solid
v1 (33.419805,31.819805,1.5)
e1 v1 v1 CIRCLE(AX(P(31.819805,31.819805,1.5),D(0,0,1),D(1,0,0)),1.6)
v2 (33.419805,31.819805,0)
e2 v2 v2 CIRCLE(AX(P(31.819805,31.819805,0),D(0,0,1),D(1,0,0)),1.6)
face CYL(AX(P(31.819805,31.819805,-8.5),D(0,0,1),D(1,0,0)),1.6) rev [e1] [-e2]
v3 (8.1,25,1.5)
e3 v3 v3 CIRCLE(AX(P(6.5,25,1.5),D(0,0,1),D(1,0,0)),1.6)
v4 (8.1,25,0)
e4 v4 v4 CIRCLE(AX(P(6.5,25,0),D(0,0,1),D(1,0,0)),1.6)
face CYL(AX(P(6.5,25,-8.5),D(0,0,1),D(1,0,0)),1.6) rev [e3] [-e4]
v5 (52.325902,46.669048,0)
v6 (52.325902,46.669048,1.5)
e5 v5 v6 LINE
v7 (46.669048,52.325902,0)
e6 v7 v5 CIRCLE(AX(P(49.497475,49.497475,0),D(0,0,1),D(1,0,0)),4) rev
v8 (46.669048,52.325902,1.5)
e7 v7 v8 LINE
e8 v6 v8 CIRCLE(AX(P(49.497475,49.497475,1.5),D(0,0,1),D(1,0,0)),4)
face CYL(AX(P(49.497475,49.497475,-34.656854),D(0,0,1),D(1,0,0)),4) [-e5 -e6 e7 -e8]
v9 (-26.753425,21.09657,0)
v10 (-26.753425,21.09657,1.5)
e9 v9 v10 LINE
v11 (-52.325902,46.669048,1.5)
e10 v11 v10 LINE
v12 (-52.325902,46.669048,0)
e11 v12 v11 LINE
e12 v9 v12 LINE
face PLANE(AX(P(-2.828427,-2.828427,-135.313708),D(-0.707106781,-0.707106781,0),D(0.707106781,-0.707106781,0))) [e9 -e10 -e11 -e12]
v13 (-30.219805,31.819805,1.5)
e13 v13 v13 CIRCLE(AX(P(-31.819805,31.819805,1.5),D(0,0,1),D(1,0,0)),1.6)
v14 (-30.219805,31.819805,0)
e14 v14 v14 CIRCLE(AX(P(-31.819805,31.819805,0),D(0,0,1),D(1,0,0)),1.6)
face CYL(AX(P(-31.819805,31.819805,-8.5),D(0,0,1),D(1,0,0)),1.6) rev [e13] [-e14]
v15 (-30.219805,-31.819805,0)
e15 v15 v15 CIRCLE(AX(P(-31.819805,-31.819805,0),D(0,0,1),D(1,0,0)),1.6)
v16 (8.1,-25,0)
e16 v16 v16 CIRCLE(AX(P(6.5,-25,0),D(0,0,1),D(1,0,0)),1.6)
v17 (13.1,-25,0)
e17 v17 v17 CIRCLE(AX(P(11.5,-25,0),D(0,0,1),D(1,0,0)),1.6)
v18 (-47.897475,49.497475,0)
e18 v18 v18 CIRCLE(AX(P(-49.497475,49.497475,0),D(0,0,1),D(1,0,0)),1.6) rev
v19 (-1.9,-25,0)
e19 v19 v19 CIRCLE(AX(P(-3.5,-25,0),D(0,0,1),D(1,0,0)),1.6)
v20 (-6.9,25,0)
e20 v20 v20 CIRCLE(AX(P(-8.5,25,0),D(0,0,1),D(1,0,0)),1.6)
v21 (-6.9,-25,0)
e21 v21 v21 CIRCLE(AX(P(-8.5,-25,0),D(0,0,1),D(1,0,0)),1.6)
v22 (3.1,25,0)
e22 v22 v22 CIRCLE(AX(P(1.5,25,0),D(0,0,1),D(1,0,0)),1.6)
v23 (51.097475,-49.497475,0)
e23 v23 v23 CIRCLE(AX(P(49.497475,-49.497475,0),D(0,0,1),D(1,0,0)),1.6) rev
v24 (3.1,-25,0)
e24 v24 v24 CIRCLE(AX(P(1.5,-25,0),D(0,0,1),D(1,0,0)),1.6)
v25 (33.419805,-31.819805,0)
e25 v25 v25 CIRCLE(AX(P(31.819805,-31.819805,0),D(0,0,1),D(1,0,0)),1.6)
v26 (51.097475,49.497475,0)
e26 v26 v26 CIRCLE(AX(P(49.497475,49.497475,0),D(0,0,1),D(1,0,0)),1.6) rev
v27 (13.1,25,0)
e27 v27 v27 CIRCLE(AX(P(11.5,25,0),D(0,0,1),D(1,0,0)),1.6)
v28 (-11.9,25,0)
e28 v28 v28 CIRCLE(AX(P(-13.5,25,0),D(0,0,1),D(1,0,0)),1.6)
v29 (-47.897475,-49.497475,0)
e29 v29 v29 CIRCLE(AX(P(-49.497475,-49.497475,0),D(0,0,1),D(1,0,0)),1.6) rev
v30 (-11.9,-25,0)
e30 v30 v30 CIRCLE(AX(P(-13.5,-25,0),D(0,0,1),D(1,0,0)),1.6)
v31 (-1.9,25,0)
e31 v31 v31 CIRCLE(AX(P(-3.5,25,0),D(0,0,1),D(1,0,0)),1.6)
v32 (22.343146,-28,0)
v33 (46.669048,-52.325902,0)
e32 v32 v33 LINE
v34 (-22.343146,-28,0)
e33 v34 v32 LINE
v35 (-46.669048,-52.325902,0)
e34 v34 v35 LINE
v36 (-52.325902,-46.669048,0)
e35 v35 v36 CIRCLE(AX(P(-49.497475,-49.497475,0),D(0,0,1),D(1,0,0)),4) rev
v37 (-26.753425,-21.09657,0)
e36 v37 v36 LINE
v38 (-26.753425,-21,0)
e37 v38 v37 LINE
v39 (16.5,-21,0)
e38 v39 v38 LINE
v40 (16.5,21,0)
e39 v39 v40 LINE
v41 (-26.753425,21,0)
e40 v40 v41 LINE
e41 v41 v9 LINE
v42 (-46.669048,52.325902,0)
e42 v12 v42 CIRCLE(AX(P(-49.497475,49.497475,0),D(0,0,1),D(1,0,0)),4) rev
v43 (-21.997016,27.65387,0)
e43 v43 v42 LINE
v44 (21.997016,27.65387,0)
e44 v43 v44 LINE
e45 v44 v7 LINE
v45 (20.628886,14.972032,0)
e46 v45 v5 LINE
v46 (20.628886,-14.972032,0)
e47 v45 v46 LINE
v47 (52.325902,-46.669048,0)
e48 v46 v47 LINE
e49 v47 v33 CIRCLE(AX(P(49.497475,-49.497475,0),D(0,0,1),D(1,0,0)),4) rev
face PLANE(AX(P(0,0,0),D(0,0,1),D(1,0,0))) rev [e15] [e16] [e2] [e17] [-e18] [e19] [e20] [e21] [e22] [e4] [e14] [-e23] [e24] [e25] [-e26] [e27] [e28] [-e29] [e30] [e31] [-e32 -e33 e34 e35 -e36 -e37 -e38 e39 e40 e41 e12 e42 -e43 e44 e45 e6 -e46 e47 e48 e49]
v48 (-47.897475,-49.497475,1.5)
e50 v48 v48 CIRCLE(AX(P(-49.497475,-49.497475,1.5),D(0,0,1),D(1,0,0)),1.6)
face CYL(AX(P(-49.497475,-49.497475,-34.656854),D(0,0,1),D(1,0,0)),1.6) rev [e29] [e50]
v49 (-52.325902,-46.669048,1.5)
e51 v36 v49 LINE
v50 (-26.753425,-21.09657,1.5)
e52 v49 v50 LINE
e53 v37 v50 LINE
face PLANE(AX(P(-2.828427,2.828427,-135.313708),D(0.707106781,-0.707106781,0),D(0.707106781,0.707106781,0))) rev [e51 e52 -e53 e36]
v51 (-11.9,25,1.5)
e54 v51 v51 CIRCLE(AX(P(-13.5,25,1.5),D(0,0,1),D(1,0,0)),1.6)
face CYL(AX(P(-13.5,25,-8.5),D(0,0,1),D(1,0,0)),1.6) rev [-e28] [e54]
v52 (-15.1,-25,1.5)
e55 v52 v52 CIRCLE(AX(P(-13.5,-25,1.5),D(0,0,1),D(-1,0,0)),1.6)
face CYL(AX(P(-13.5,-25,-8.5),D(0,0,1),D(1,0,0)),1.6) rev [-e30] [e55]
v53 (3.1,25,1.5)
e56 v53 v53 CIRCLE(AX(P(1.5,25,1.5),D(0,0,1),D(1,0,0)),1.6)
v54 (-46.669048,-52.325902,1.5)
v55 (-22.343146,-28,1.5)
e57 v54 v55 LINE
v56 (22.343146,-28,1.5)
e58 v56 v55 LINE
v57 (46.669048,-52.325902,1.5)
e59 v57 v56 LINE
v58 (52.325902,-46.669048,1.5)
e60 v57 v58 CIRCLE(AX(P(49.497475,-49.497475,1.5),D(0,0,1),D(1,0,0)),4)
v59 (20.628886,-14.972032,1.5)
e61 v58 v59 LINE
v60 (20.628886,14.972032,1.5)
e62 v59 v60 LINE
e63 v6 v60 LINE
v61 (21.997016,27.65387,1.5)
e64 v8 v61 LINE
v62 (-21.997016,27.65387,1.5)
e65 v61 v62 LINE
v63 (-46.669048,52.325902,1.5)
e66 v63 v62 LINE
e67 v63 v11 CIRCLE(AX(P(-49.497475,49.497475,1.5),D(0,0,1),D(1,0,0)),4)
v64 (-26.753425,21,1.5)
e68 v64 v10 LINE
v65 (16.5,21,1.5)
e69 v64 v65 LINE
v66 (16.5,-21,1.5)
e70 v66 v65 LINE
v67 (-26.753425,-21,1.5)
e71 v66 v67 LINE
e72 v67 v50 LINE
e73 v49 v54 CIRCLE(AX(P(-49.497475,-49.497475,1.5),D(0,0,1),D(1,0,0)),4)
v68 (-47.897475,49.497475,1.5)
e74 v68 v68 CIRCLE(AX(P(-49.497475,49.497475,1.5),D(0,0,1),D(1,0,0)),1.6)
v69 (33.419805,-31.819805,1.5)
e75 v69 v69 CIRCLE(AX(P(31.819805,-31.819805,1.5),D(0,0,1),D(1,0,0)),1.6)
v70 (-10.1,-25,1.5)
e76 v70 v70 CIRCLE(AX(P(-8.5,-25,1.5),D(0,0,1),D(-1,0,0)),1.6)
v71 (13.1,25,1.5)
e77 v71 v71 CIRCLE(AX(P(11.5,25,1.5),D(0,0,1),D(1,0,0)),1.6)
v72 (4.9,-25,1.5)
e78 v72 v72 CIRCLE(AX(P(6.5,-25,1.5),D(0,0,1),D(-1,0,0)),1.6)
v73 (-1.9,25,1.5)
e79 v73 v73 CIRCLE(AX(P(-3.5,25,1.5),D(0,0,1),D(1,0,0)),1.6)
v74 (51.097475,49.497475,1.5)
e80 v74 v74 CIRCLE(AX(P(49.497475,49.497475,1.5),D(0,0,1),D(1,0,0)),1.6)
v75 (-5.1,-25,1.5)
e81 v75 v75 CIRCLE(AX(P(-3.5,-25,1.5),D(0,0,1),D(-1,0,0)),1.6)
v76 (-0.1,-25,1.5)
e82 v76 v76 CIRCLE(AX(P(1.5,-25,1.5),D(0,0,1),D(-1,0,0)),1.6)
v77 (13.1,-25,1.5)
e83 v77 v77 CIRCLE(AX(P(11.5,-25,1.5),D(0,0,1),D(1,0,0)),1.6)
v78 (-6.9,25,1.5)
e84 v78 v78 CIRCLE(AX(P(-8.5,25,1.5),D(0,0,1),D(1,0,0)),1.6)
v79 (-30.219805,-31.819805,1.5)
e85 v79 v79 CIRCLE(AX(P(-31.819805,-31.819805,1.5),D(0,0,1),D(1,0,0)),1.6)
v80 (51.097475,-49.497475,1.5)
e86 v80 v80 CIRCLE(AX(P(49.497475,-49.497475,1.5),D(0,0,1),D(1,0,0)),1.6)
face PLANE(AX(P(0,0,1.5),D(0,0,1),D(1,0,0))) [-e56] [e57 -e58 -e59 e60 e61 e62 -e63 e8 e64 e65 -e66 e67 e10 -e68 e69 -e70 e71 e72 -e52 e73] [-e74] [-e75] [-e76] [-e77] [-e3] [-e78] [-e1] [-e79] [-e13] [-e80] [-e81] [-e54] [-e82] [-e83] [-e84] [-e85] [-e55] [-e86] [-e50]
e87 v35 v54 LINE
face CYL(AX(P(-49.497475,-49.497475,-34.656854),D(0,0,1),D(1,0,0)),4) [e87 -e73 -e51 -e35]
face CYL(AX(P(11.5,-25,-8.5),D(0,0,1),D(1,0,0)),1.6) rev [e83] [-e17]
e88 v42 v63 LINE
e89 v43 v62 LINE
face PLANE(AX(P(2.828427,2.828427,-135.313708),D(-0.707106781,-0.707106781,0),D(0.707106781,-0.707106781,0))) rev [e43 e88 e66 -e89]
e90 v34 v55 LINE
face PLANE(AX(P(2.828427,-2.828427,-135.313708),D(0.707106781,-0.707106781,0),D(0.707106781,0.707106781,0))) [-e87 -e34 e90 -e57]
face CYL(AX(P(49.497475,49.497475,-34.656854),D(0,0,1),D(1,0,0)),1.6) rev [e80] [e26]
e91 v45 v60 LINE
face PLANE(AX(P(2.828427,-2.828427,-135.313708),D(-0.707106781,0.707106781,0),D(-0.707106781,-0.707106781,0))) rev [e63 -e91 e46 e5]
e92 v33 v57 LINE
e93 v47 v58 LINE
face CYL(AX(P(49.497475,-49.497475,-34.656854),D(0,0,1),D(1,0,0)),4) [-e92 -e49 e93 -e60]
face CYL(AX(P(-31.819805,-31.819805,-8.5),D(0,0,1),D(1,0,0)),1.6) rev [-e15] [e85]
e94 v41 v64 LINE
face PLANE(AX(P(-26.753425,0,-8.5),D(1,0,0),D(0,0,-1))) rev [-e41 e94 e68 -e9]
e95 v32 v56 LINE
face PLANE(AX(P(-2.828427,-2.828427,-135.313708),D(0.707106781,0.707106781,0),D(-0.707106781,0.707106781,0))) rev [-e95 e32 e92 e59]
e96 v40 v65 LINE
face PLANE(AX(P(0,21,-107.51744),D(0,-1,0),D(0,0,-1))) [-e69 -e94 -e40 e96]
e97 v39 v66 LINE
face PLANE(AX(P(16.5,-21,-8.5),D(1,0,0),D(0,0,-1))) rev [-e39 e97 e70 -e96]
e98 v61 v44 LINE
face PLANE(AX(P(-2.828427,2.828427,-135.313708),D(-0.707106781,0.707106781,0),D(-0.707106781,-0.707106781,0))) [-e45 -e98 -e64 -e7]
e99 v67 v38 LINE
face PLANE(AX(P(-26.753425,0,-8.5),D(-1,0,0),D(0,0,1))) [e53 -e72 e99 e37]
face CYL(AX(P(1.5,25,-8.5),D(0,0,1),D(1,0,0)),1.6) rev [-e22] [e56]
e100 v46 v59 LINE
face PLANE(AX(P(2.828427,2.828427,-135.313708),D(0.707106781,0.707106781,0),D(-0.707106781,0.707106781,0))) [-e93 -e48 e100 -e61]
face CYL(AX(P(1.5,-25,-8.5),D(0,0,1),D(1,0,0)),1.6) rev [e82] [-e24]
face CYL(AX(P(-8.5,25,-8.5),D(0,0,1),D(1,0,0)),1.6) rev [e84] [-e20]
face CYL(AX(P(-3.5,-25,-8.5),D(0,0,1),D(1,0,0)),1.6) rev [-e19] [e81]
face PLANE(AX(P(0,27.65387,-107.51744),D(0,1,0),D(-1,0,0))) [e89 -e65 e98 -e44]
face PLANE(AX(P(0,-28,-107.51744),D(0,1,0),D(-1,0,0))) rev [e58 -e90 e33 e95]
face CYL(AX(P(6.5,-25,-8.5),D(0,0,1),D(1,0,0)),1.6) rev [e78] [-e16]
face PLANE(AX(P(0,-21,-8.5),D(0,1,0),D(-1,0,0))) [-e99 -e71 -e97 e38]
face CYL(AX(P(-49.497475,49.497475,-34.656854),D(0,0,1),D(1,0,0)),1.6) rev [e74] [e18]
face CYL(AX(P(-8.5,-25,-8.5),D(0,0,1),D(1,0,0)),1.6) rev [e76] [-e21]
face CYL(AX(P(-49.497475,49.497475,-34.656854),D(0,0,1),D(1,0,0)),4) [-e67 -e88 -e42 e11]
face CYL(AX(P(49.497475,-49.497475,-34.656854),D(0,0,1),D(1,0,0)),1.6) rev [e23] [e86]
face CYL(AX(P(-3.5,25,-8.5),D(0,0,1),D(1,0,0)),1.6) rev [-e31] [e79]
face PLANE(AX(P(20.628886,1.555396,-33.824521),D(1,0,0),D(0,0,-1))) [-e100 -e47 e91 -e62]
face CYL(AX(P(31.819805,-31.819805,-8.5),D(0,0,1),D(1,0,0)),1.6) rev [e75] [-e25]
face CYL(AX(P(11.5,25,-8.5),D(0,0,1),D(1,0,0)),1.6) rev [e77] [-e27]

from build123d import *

# Parameters (mm, degrees)
CUT_EXTRUDE1_START       = -1.5
CUT_EXTRUDE1_OUTLINE_R   = 1.6
CUT_EXTRUDE1_DEPTH       = 1.5
CUT_EXTRUDE1_2_OUTLINE_R = 1.6
CUT_EXTRUDE1_2_DEPTH     = 1.5
CUT_EXTRUDE1_3_OUTLINE_R = 1.6
CUT_EXTRUDE1_3_DEPTH     = 1.5
BOSS_EXTRUDE1_DEPTH      = 1.5
BOSS_EXTRUDE2_DEPTH      = 1.5
BOSS_EXTRUDE3_START      = -1.5
SKETCH4_W                = 8
SKETCH4_H                = 34
SKETCH4_R                = 1.6
BOSS_EXTRUDE3_DEPTH      = 1.5
CUT_EXTRUDE2_DEPTH       = 10
SKETCH6_R                = 1.6
CUT_EXTRUDE3_DEPTH       = 10
CUT_EXTRUDE4_DEPTH       = 10
SKETCH8_R                = 1.6
CUT_EXTRUDE6_DEPTH       = 10
BOSS_EXTRUDE4_DEPTH      = 1.5
SKETCH10_W               = 3.5
SKETCH10_H               = 42
CUT_EXTRUDE7_DEPTH       = 10
CUT_EXTRUDE8_START       = -10
SKETCH11_R               = 1.6
CUT_EXTRUDE8_DEPTH       = 10
BOSS_EXTRUDE5_DEPTH      = 1.5
SKETCH13_R               = 1.6
BOSS_EXTRUDE6_DEPTH      = 1.5
SKETCH14_R               = 1.6
CUT_EXTRUDE9_DEPTH       = 10
BOSS_EXTRUDE7_DEPTH      = 1.5
SKETCH16_R               = 1.6
CUT_EXTRUDE10_DEPTH      = 10
SKETCH17_R               = 1.6
BOSS_EXTRUDE8_DEPTH      = 1.5
SKETCH18_R               = 1.6
CUT_EXTRUDE11_DEPTH      = 10
CUT_EXTRUDE12_START      = -2
CUT_EXTRUDE12_OUTLINE_R  = 1.6
CUT_EXTRUDE12_DEPTH      = 3
SKETCH20_R               = 1.6
BOSS_EXTRUDE9_DEPTH      = 1.5
SKETCH21_R               = 1.6
BOSS_EXTRUDE10_DEPTH     = 1.5
SKETCH22_R               = 89.618816207
CUT_EXTRUDE13_DEPTH      = 10
SKETCH23_R               = 1.6
BOSS_EXTRUDE11_DEPTH     = 1.5


with BuildPart() as part:
    # Cut-Extrude1: read off the stored shape, not the designer's step
    # Cut-Extrude1 outline → Cut-Extrude1 (new body)
    with BuildSketch(Plane.XY.offset(1.5).offset(CUT_EXTRUDE1_START)):
        with BuildLine():
            ThreePointArc((-32.828427125, -27.171572875), (-32.828427125, -32.828427125), (-27.171572875, -32.828427125))
            Line((-27.171572875, -32.828427125), (-15.343145751, -21))
            Line((-15.343145751, -21), (-28, -21))
            Line((-28, -21), (-28, -22.246575342))
            Line((-28, -22.246575342), (-32.876712329, -27.123287671))
            Line((-32.876712329, -27.123287671), (-32.828427125, -27.171572875))
        make_face()
        with Locations((-30, -30)):
            Circle(CUT_EXTRUDE1_OUTLINE_R, mode=Mode.SUBTRACT)
    extrude(amount=CUT_EXTRUDE1_DEPTH)



with BuildPart() as body_2:
    # Cut-Extrude1 2 outline → Cut-Extrude1 2 (new body)
    with BuildSketch(Plane.XY.offset(1.5).offset(CUT_EXTRUDE1_START)):
        with BuildLine():
            Line((21, 31.740068927), (21, -13))
            Line((21, -13), (13, -13))
            Line((13, -13), (13, -20))
            Line((13, -20), (14.343145751, -20))
            Line((14.343145751, -20), (27.171572875, -32.828427125))
            ThreePointArc((27.171572875, -32.828427125), (32.828427125, -32.828427125), (32.828427125, -27.171572875))
            Line((32.828427125, -27.171572875), (28, -22.343145751))
            Line((28, -22.343145751), (28, 27.653870467))
            Line((28, 27.653870467), (36.085493114, 37.454468181))
            ThreePointArc((36.085493114, 37.454468181), (35.545531819, 43.085493114), (29.914506886, 42.545531819))
            Line((29.914506886, 42.545531819), (21, 31.740068927))
        make_face()
        with Locations((30, -30)):
            Circle(CUT_EXTRUDE1_2_OUTLINE_R, mode=Mode.SUBTRACT)
        with Locations((25, -6.5)):
            Circle(CUT_EXTRUDE1_2_OUTLINE_R, mode=Mode.SUBTRACT)
        with Locations((25, -1.5)):
            Circle(CUT_EXTRUDE1_2_OUTLINE_R, mode=Mode.SUBTRACT)
        with Locations((25, 3.5)):
            Circle(CUT_EXTRUDE1_2_OUTLINE_R, mode=Mode.SUBTRACT)
        with Locations((25, 8.5)):
            Circle(CUT_EXTRUDE1_2_OUTLINE_R, mode=Mode.SUBTRACT)
        with Locations((25, 13.5)):
            Circle(CUT_EXTRUDE1_2_OUTLINE_R, mode=Mode.SUBTRACT)
        with Locations((33, 40)):
            Circle(CUT_EXTRUDE1_2_OUTLINE_R, mode=Mode.SUBTRACT)
    extrude(amount=CUT_EXTRUDE1_2_DEPTH)



with BuildPart() as body_3:
    # Cut-Extrude1 3 outline → Cut-Extrude1 3 (new body)
    with BuildSketch(Plane.XY.offset(1.5).offset(CUT_EXTRUDE1_START)):
        with BuildLine():
            Line((-28, 21), (-21, 21))
            Line((-21, 21), (-21, 31.740068927))
            Line((-21, 31.740068927), (-29.914506886, 42.545531819))
            ThreePointArc((-29.914506886, 42.545531819), (-35.545531819, 43.085493114), (-36.085493114, 37.454468181))
            Line((-36.085493114, 37.454468181), (-28, 27.653870467))
            Line((-28, 27.653870467), (-28, 21))
        make_face()
        with Locations((-33, 40)):
            Circle(CUT_EXTRUDE1_3_OUTLINE_R, mode=Mode.SUBTRACT)
    extrude(amount=CUT_EXTRUDE1_3_DEPTH)


with BuildPart() as body_2_1:
    add(body_2.part)

    add(body_3.part)  # Boss-Extrude1 merges body 3
    # Sketch2 → Boss-Extrude1 (add)
    with BuildSketch(Plane.XY.offset(1.5)):
        Polygon((-21, 21), (21, 21), (21, 31.740068927), (17.62888627, 27.653870467), (-17.62888627, 27.653870467), (-21, 31.740068927), align=None)
    extrude(amount=-BOSS_EXTRUDE1_DEPTH)


with BuildPart() as part_1:
    add(part.part)

    add(body_2_1.part)  # Boss-Extrude2 merges body 2
    # Sketch3 → Boss-Extrude2 (add)
    with BuildSketch(Plane.XY.offset(1.5)):
        Polygon((-15.343145751, -21), (-22.343145751, -28), (22.343145751, -28), (15.343145751, -21), align=None)
    extrude(amount=-BOSS_EXTRUDE2_DEPTH)

    # Sketch4 → Boss-Extrude3 (add)
    with BuildSketch(Plane.XY.offset(1.5).offset(BOSS_EXTRUDE3_START)):
        Polygon((14.343145751, -20), (13, -20), (13, -21), (15.343145751, -21), align=None)
        with Locations((17, 4)):
            Rectangle(SKETCH4_W, SKETCH4_H)
        with Locations((25, -6.5)):
            Circle(SKETCH4_R)
        with Locations((25, -1.5)):
            Circle(SKETCH4_R)
        with Locations((25, 3.5)):
            Circle(SKETCH4_R)
        with Locations((25, 8.5)):
            Circle(SKETCH4_R)
        with Locations((25, 13.5)):
            Circle(SKETCH4_R)
    extrude(amount=BOSS_EXTRUDE3_DEPTH)

    # Sketch5 → Cut-Extrude2 (cut)
    with BuildSketch(Plane.XY.offset(1.5)):
        Polygon((28, 27.653870467), (17.62888627, 15.082823521), (17.62888627, -11.972032021), (28, -22.343145751), align=None)
    extrude(amount=-CUT_EXTRUDE2_DEPTH, mode=Mode.SUBTRACT)

    # Sketch6 → Cut-Extrude3 (cut)
    with BuildSketch(Plane.XY.offset(1.5)):
        with Locations((6.5, 25)):
            Circle(SKETCH6_R)
        with Locations((1.5, 25)):
            Circle(SKETCH6_R)
        with Locations((-3.5, 25)):
            Circle(SKETCH6_R)
        with Locations((-8.5, 25)):
            Circle(SKETCH6_R)
        with Locations((-13.5, 25)):
            Circle(SKETCH6_R)
        with Locations((-13.5, -25)):
            Circle(SKETCH6_R)
        with Locations((-8.5, -25)):
            Circle(SKETCH6_R)
        with Locations((-3.5, -25)):
            Circle(SKETCH6_R)
        with Locations((1.5, -25)):
            Circle(SKETCH6_R)
        with Locations((6.5, -25)):
            Circle(SKETCH6_R)
    extrude(amount=-CUT_EXTRUDE3_DEPTH, mode=Mode.SUBTRACT)

    # Sketch7 → Cut-Extrude4 (cut)
    with BuildSketch(Plane.XY.offset(1.5)):
        Polygon((-28, 27.653870467), (-19.973613934, 17.924917659), (-36.717571938, 15.874580857), align=None)
        Polygon((-28, -22.246575342), (-20.930672911, -15.177248254), (-29.189636074, -18.711911798), align=None)
    extrude(amount=-CUT_EXTRUDE4_DEPTH, mode=Mode.SUBTRACT)

    # Sketch8 → Cut-Extrude6 (cut)
    with BuildSketch(Plane.XY.offset(1.5)):
        with Locations((11.5, -25)):
            Circle(SKETCH8_R)
        with Locations((11.5, 25)):
            Circle(SKETCH8_R)
    extrude(amount=-CUT_EXTRUDE6_DEPTH, mode=Mode.SUBTRACT)

    # Sketch9 → Boss-Extrude4 (add)
    with BuildSketch(Plane.XY.offset(1.5)):
        Polygon((20.62888627, 1.55539575), (20.62888627, 18.719187158), (17.62888627, 15.082823521), (17.62888627, -11.972032021), (20.62888627, -14.972032021), align=None)
    extrude(amount=-BOSS_EXTRUDE4_DEPTH)

    # Sketch10 → Cut-Extrude7 (cut)
    with BuildSketch(Plane.XY.offset(1.5)):
        with Locations((14.75, 0)):
            Rectangle(SKETCH10_W, SKETCH10_H)
    extrude(amount=-CUT_EXTRUDE7_DEPTH, mode=Mode.SUBTRACT)

    # Sketch11 → Cut-Extrude8 (cut)
    # profile 1 of 4: a face of its own
    with BuildSketch(Plane.XY.offset(1.5).offset(CUT_EXTRUDE8_START)):
        with BuildLine():
            Line((20.62888627, 27.653870467), (20.62888627, 18.719187158))
            Line((20.62888627, 18.719187158), (36.085493114, 37.454468181))
            ThreePointArc((36.085493114, 37.454468181), (35.545531819, 43.085493114), (29.914506886, 42.545531819))
            Line((29.914506886, 42.545531819), (17.62888627, 27.653870467))
            Line((17.62888627, 27.653870467), (20.62888627, 27.653870467))
        make_face()
        with Locations((33, 40)):
            Circle(SKETCH11_R, mode=Mode.SUBTRACT)
    # profile 2 of 4: a face of its own
    with BuildSketch(Plane.XY.offset(1.5).offset(CUT_EXTRUDE8_START)):
        with BuildLine():
            Line((-36.085493114, 37.454468181), (-26.753424658, 26.142870052))
            Line((-26.753424658, 26.142870052), (-26.753424658, 27.653870467))
            Line((-26.753424658, 27.653870467), (-17.62888627, 27.653870467))
            Line((-17.62888627, 27.653870467), (-29.914506886, 42.545531819))
            ThreePointArc((-29.914506886, 42.545531819), (-35.545531819, 43.085493114), (-36.085493114, 37.454468181))
        make_face()
        with Locations((-33, 40)):
            Circle(SKETCH11_R, mode=Mode.SUBTRACT)
    # profile 3 of 4: a face of its own
    with BuildSketch(Plane.XY.offset(1.5).offset(CUT_EXTRUDE8_START)):
        with BuildLine():
            Line((-27.171572875, -32.828427125), (-22.343145751, -28))
            Line((-22.343145751, -28), (-26.753424658, -28))
            Line((-26.753424658, -28), (-26.753424658, -21))
            Line((-26.753424658, -21), (-32.876712329, -27.123287671))
            Line((-32.876712329, -27.123287671), (-32.828427125, -27.171572875))
            ThreePointArc((-32.828427125, -27.171572875), (-32.828427125, -32.828427125), (-27.171572875, -32.828427125))
        make_face()
        with Locations((-30, -30)):
            Circle(SKETCH11_R, mode=Mode.SUBTRACT)
    # profile 4 of 4: a face of its own
    with BuildSketch(Plane.XY.offset(1.5).offset(CUT_EXTRUDE8_START)):
        with BuildLine():
            Line((32.828427125, -27.171572875), (20.62888627, -14.972032021))
            Line((20.62888627, -14.972032021), (20.62888627, -28))
            Line((20.62888627, -28), (22.343145751, -28))
            Line((22.343145751, -28), (27.171572875, -32.828427125))
            ThreePointArc((27.171572875, -32.828427125), (32.828427125, -32.828427125), (32.828427125, -27.171572875))
        make_face()
        with Locations((30, -30)):
            Circle(SKETCH11_R, mode=Mode.SUBTRACT)
    extrude(amount=CUT_EXTRUDE8_DEPTH, mode=Mode.SUBTRACT)

    # Sketch12 → Boss-Extrude5 (add)
    with BuildSketch(Plane.XY.offset(1.5)):
        Polygon((-22.510556865, 21), (-26.753424658, 21), (-26.753424658, 26.142870052), align=None)
    extrude(amount=-BOSS_EXTRUDE5_DEPTH)

    # Sketch13 → Boss-Extrude6 (add)
    # profile 1 of 4: a face of its own
    with BuildSketch(Plane.XY.offset(1.5)):
        with BuildLine():
            Line((20.62888627, 26.28574052), (20.62888627, 14.972032021))
            Line((20.62888627, 14.972032021), (46.669047558, 41.012193309))
            ThreePointArc((46.669047558, 41.012193309), (46.669047558, 46.669047558), (41.012193309, 46.669047558))
            Line((41.012193309, 46.669047558), (20.62888627, 26.28574052))
        make_face()
    # profile 2 of 4: a face of its own
    with BuildSketch(Plane.XY.offset(1.5)):
        with BuildLine():
            Line((-46.669047558, 41.012193309), (-26.753424658, 21.096570408))
            Line((-26.753424658, 21.096570408), (-26.753424658, 27.653870467))
            Line((-26.753424658, 27.653870467), (-21.997016217, 27.653870467))
            Line((-21.997016217, 27.653870467), (-41.012193309, 46.669047558))
            ThreePointArc((-41.012193309, 46.669047558), (-46.669047558, 46.669047558), (-46.669047558, 41.012193309))
        make_face()
        with Locations((-43.840620434, 43.840620434)):
            Circle(SKETCH13_R, mode=Mode.SUBTRACT)
    # profile 3 of 4: a face of its own
    with BuildSketch(Plane.XY.offset(1.5)):
        with BuildLine():
            ThreePointArc((-46.669047558, -41.012193309), (-46.669047558, -46.669047558), (-41.012193309, -46.669047558))
            Line((-41.012193309, -46.669047558), (-22.343145751, -28))
            Line((-22.343145751, -28), (-26.753424658, -28))
            Line((-26.753424658, -28), (-26.753424658, -21.096570408))
            Line((-26.753424658, -21.096570408), (-46.669047558, -41.012193309))
        make_face()
        with Locations((-43.840620434, -43.840620434)):
            Circle(SKETCH13_R, mode=Mode.SUBTRACT)
    # profile 4 of 4: a face of its own
    with BuildSketch(Plane.XY.offset(1.5)):
        with BuildLine():
            Line((20.62888627, -26.28574052), (41.012193309, -46.669047558))
            ThreePointArc((41.012193309, -46.669047558), (46.669047558, -46.669047558), (46.669047558, -41.012193309))
            Line((46.669047558, -41.012193309), (20.62888627, -14.972032021))
            Line((20.62888627, -14.972032021), (20.62888627, -26.28574052))
        make_face()
        with Locations((43.840620434, -43.840620434)):
            Circle(SKETCH13_R, mode=Mode.SUBTRACT)
    extrude(amount=-BOSS_EXTRUDE6_DEPTH)

    # Sketch14 → Cut-Extrude9 (cut)
    with BuildSketch(Plane.XY.offset(1.5)):
        with Locations((43.840620434, 43.840620434)):
            Circle(SKETCH14_R)
    extrude(amount=-CUT_EXTRUDE9_DEPTH, mode=Mode.SUBTRACT)

    # Sketch15 → Boss-Extrude7 (add)
    with BuildSketch(Plane.XY.offset(1.5)):
        Polygon((20.62888627, -28), (22.343145751, -28), (22.343145751, -20.852318202), (17.520154223, -24.044979555), align=None)
        Polygon((20.62888627, 27.653870467), (24.477160925, 27.653870467), (19.074520247, 22.251229789), (17.520154223, 26.392880602), align=None)
    extrude(amount=-BOSS_EXTRUDE7_DEPTH)

    # Sketch16 → Cut-Extrude10 (cut)
    with BuildSketch(Plane.XY.offset(1.5)):
        with Locations((-31.819805153, 31.819805153)):
            Circle(SKETCH16_R)
        with Locations((31.819805153, 31.819805153)):
            Circle(SKETCH16_R)
        with Locations((31.819805153, -31.819805153)):
            Circle(SKETCH16_R)
        with Locations((-31.819805153, -31.819805153)):
            Circle(SKETCH16_R)
    extrude(amount=-CUT_EXTRUDE10_DEPTH, mode=Mode.SUBTRACT)

    # Sketch17 → Boss-Extrude8 (add)
    with BuildSketch(Plane.XY.offset(1.5)):
        with BuildLine():
            ThreePointArc((-31.819805153, 35.819805153), (-28.355703538, 33.819805153), (-28.355703538, 29.819805153))
            Line((-28.355703538, 29.819805153), (28.355703538, 29.819805153))
            ThreePointArc((28.355703538, 29.819805153), (28.355703538, 33.819805153), (31.819805153, 35.819805153))
            Line((31.819805153, 35.819805153), (-31.819805153, 35.819805153))
        make_face()
        with Locations((-8, 32.819805153)):
            Circle(SKETCH17_R, mode=Mode.SUBTRACT)
        with Locations((8, 32.819805153)):
            Circle(SKETCH17_R, mode=Mode.SUBTRACT)
    extrude(amount=-BOSS_EXTRUDE8_DEPTH)

    # Sketch18 → Cut-Extrude11 (cut)
    with BuildSketch(Plane.XY.offset(1.5)):
        with Locations((38.890872965, -38.890872965)):
            Circle(SKETCH18_R)
        with Locations((-38.890872965, -38.890872965)):
            Circle(SKETCH18_R)
        with Locations((38.890872965, 38.890872965)):
            Circle(SKETCH18_R)
        with Locations((-38.890872965, 38.890872965)):
            Circle(SKETCH18_R)
    extrude(amount=-CUT_EXTRUDE11_DEPTH, mode=Mode.SUBTRACT)

    # Cut-Extrude12: read off the stored shape, not the designer's step
    # Cut-Extrude12 outline → Cut-Extrude12 (cut)
    # profile 1 of 4: a face of its own
    with BuildSketch(Plane.XY.offset(1.5).offset(CUT_EXTRUDE12_START)):
        with BuildLine():
            Line((36.222978367, 41.879832617), (36.224492351, 41.872552763))
            ThreePointArc((36.224492351, 41.872552763), (41.797056095, 41.639345199), (41.71930009, 36.062445841))
            Line((41.71930009, 36.062445841), (46.669047558, 41.012193309))
            ThreePointArc((46.669047558, 41.012193309), (46.669047558, 46.669047558), (41.012193309, 46.669047558))
            Line((41.012193309, 46.669047558), (36.222978367, 41.879832617))
        make_face()
        with Locations((43.840620434, 43.840620434)):
            Circle(CUT_EXTRUDE12_OUTLINE_R, mode=Mode.SUBTRACT)
    # profile 2 of 4: a face of its own
    with BuildSketch(Plane.XY.offset(1.5).offset(CUT_EXTRUDE12_START)):
        with BuildLine():
            ThreePointArc((41.71930009, -36.062445841), (41.71930009, -41.71930009), (36.062445841, -41.71930009))
            Line((36.062445841, -41.71930009), (41.012193309, -46.669047558))
            ThreePointArc((41.012193309, -46.669047558), (46.669047558, -46.669047558), (46.669047558, -41.012193309))
            Line((46.669047558, -41.012193309), (41.71930009, -36.062445841))
        make_face()
        with Locations((43.840620434, -43.840620434)):
            Circle(CUT_EXTRUDE12_OUTLINE_R, mode=Mode.SUBTRACT)
    # profile 3 of 4: a face of its own
    with BuildSketch(Plane.XY.offset(1.5).offset(CUT_EXTRUDE12_START)):
        with BuildLine():
            ThreePointArc((-36.062445841, -41.71930009), (-41.550778866, -41.878330178), (-42.027335486, -36.408413931))
            Line((-42.027335486, -36.408413931), (-42.048509384, -36.391655135))
            Line((-42.048509384, -36.391655135), (-46.669047558, -41.012193309))
            ThreePointArc((-46.669047558, -41.012193309), (-46.669047558, -46.669047558), (-41.012193309, -46.669047558))
            Line((-41.012193309, -46.669047558), (-36.062445841, -41.71930009))
        make_face()
        with Locations((-43.840620434, -43.840620434)):
            Circle(CUT_EXTRUDE12_OUTLINE_R, mode=Mode.SUBTRACT)
    # profile 4 of 4: a face of its own
    with BuildSketch(Plane.XY.offset(1.5).offset(CUT_EXTRUDE12_START)):
        with BuildLine():
            ThreePointArc((-41.815610055, 36.162152944), (-41.66986379, 41.767887042), (-36.062445841, 41.71930009))
            Line((-36.062445841, 41.71930009), (-41.012193309, 46.669047558))
            ThreePointArc((-41.012193309, 46.669047558), (-46.669047558, 46.669047558), (-46.669047558, 41.012193309))
            Line((-46.669047558, 41.012193309), (-41.817773996, 36.160919747))
            Line((-41.817773996, 36.160919747), (-41.815610055, 36.162152944))
        make_face()
        with Locations((-43.840620434, 43.840620434)):
            Circle(CUT_EXTRUDE12_OUTLINE_R, mode=Mode.SUBTRACT)
    extrude(amount=CUT_EXTRUDE12_DEPTH, mode=Mode.SUBTRACT)

    # Sketch20 → Boss-Extrude9 (add)
    # profile 1 of 2: a face of its own
    with BuildSketch(Plane.XY.offset(1.5)):
        Polygon((-30.162950904, 35.819805153), (-24.162950904, 29.819805153), (24.162950904, 29.819805153), (30.162950904, 35.819805153), align=None)
        with Locations((-8, 32.819805153)):
            Circle(SKETCH20_R, mode=Mode.SUBTRACT)
        with Locations((8, 32.819805153)):
            Circle(SKETCH20_R, mode=Mode.SUBTRACT)
    # profile 2 of 2: a face of its own
    with BuildSketch(Plane.XY.offset(1.5)):
        Polygon((30.162950904, -35.819805153), (-30.162950904, -35.819805153), (-24.162950904, -29.819805153), (24.162950904, -29.819805153), align=None)
        with Locations((8, -32.819805153)):
            Circle(SKETCH20_R, mode=Mode.SUBTRACT)
        with Locations((-8, -32.819805153)):
            Circle(SKETCH20_R, mode=Mode.SUBTRACT)
    extrude(amount=-BOSS_EXTRUDE9_DEPTH)

    # Sketch21 → Boss-Extrude10 (add)
    with BuildSketch(Plane.XY.offset(1.5)):
        Polygon((24.162950904, 24.506096654), (24.162950904, -29.819805153), (30.162950904, -26.836364226), (30.162950904, 24.506096654), align=None)
        with Locations((27.162950904, 8)):
            Circle(SKETCH21_R, mode=Mode.SUBTRACT)
        with Locations((27.162950904, -8)):
            Circle(SKETCH21_R, mode=Mode.SUBTRACT)
    extrude(amount=-BOSS_EXTRUDE10_DEPTH)

    # Sketch22 → Cut-Extrude13 (cut)
    with BuildSketch(Plane.XY.offset(1.5)):
        Circle(SKETCH22_R)
        with BuildLine():
            Line((-24.162950904, -29.819805153), (-28.991378029, -34.648232278))
            ThreePointArc((-28.991378029, -34.648232278), (-34.648232278, -34.648232278), (-34.648232278, -28.991378029))
            Line((-34.648232278, -28.991378029), (-26.753424658, -21.096570408))
            Line((-26.753424658, -21.096570408), (-26.753424658, -21))
            Line((-26.753424658, -21), (-26.753424658, 21.096570408))
            Line((-26.753424658, 21.096570408), (-34.648232278, 28.991378029))
            ThreePointArc((-34.648232278, 28.991378029), (-34.648232278, 34.648232278), (-28.991378029, 34.648232278))
            Line((-28.991378029, 34.648232278), (-21.997016217, 27.653870467))
            Line((-21.997016217, 27.653870467), (21.997016217, 27.653870467))
            Line((21.997016217, 27.653870467), (28.991378029, 34.648232278))
            ThreePointArc((28.991378029, 34.648232278), (34.648232278, 34.648232278), (34.648232278, 28.991378029))
            Line((34.648232278, 28.991378029), (20.62888627, 14.972032021))
            Line((20.62888627, 14.972032021), (20.62888627, -14.972032021))
            Line((20.62888627, -14.972032021), (34.648232278, -28.991378029))
            ThreePointArc((34.648232278, -28.991378029), (34.648232278, -34.648232278), (28.991378029, -34.648232278))
            Line((28.991378029, -34.648232278), (24.162950904, -29.819805153))
            Line((24.162950904, -29.819805153), (-24.162950904, -29.819805153))
        make_face(mode=Mode.SUBTRACT)
    extrude(amount=-CUT_EXTRUDE13_DEPTH, mode=Mode.SUBTRACT)

    # Sketch23 → Boss-Extrude11 (add)
    # profile 1 of 4: a face of its own
    with BuildSketch(Plane.XY.offset(1.5)):
        with BuildLine():
            Line((46.669047558, -52.325901808), (28.991378029, -34.648232278))
            ThreePointArc((28.991378029, -34.648232278), (34.648232278, -34.648232278), (34.648232278, -28.991378029))
            Line((34.648232278, -28.991378029), (52.325901808, -46.669047558))
            ThreePointArc((52.325901808, -46.669047558), (52.325901808, -52.325901808), (46.669047558, -52.325901808))
        make_face()
        with Locations((49.497474683, -49.497474683)):
            Circle(SKETCH23_R, mode=Mode.SUBTRACT)
    # profile 2 of 4: a face of its own
    with BuildSketch(Plane.XY.offset(1.5)):
        with BuildLine():
            Line((28.991378029, 34.648232278), (46.669047558, 52.325901808))
            ThreePointArc((46.669047558, 52.325901808), (52.325901808, 52.325901808), (52.325901808, 46.669047558))
            Line((52.325901808, 46.669047558), (34.648232278, 28.991378029))
            ThreePointArc((34.648232278, 28.991378029), (34.648232278, 34.648232278), (28.991378029, 34.648232278))
        make_face()
        with Locations((49.497474683, 49.497474683)):
            Circle(SKETCH23_R, mode=Mode.SUBTRACT)
    # profile 3 of 4: a face of its own
    with BuildSketch(Plane.XY.offset(1.5)):
        with BuildLine():
            Line((-52.325901808, -46.669047558), (-34.648232278, -28.991378029))
            ThreePointArc((-34.648232278, -28.991378029), (-34.648232278, -34.648232278), (-28.991378029, -34.648232278))
            Line((-28.991378029, -34.648232278), (-46.669047558, -52.325901808))
            ThreePointArc((-46.669047558, -52.325901808), (-52.325901808, -52.325901808), (-52.325901808, -46.669047558))
        make_face()
        with Locations((-49.497474683, -49.497474683)):
            Circle(SKETCH23_R, mode=Mode.SUBTRACT)
    # profile 4 of 4: a face of its own
    with BuildSketch(Plane.XY.offset(1.5)):
        with BuildLine():
            Line((-46.669047558, 52.325901808), (-28.991378029, 34.648232278))
            ThreePointArc((-28.991378029, 34.648232278), (-34.648232278, 34.648232278), (-34.648232278, 28.991378029))
            Line((-34.648232278, 28.991378029), (-52.325901808, 46.669047558))
            ThreePointArc((-52.325901808, 46.669047558), (-52.325901808, 52.325901808), (-46.669047558, 52.325901808))
        make_face()
        with Locations((-49.497474683, 49.497474683)):
            Circle(SKETCH23_R, mode=Mode.SUBTRACT)
    extrude(amount=-BOSS_EXTRUDE11_DEPTH)


solid = part_1.part
